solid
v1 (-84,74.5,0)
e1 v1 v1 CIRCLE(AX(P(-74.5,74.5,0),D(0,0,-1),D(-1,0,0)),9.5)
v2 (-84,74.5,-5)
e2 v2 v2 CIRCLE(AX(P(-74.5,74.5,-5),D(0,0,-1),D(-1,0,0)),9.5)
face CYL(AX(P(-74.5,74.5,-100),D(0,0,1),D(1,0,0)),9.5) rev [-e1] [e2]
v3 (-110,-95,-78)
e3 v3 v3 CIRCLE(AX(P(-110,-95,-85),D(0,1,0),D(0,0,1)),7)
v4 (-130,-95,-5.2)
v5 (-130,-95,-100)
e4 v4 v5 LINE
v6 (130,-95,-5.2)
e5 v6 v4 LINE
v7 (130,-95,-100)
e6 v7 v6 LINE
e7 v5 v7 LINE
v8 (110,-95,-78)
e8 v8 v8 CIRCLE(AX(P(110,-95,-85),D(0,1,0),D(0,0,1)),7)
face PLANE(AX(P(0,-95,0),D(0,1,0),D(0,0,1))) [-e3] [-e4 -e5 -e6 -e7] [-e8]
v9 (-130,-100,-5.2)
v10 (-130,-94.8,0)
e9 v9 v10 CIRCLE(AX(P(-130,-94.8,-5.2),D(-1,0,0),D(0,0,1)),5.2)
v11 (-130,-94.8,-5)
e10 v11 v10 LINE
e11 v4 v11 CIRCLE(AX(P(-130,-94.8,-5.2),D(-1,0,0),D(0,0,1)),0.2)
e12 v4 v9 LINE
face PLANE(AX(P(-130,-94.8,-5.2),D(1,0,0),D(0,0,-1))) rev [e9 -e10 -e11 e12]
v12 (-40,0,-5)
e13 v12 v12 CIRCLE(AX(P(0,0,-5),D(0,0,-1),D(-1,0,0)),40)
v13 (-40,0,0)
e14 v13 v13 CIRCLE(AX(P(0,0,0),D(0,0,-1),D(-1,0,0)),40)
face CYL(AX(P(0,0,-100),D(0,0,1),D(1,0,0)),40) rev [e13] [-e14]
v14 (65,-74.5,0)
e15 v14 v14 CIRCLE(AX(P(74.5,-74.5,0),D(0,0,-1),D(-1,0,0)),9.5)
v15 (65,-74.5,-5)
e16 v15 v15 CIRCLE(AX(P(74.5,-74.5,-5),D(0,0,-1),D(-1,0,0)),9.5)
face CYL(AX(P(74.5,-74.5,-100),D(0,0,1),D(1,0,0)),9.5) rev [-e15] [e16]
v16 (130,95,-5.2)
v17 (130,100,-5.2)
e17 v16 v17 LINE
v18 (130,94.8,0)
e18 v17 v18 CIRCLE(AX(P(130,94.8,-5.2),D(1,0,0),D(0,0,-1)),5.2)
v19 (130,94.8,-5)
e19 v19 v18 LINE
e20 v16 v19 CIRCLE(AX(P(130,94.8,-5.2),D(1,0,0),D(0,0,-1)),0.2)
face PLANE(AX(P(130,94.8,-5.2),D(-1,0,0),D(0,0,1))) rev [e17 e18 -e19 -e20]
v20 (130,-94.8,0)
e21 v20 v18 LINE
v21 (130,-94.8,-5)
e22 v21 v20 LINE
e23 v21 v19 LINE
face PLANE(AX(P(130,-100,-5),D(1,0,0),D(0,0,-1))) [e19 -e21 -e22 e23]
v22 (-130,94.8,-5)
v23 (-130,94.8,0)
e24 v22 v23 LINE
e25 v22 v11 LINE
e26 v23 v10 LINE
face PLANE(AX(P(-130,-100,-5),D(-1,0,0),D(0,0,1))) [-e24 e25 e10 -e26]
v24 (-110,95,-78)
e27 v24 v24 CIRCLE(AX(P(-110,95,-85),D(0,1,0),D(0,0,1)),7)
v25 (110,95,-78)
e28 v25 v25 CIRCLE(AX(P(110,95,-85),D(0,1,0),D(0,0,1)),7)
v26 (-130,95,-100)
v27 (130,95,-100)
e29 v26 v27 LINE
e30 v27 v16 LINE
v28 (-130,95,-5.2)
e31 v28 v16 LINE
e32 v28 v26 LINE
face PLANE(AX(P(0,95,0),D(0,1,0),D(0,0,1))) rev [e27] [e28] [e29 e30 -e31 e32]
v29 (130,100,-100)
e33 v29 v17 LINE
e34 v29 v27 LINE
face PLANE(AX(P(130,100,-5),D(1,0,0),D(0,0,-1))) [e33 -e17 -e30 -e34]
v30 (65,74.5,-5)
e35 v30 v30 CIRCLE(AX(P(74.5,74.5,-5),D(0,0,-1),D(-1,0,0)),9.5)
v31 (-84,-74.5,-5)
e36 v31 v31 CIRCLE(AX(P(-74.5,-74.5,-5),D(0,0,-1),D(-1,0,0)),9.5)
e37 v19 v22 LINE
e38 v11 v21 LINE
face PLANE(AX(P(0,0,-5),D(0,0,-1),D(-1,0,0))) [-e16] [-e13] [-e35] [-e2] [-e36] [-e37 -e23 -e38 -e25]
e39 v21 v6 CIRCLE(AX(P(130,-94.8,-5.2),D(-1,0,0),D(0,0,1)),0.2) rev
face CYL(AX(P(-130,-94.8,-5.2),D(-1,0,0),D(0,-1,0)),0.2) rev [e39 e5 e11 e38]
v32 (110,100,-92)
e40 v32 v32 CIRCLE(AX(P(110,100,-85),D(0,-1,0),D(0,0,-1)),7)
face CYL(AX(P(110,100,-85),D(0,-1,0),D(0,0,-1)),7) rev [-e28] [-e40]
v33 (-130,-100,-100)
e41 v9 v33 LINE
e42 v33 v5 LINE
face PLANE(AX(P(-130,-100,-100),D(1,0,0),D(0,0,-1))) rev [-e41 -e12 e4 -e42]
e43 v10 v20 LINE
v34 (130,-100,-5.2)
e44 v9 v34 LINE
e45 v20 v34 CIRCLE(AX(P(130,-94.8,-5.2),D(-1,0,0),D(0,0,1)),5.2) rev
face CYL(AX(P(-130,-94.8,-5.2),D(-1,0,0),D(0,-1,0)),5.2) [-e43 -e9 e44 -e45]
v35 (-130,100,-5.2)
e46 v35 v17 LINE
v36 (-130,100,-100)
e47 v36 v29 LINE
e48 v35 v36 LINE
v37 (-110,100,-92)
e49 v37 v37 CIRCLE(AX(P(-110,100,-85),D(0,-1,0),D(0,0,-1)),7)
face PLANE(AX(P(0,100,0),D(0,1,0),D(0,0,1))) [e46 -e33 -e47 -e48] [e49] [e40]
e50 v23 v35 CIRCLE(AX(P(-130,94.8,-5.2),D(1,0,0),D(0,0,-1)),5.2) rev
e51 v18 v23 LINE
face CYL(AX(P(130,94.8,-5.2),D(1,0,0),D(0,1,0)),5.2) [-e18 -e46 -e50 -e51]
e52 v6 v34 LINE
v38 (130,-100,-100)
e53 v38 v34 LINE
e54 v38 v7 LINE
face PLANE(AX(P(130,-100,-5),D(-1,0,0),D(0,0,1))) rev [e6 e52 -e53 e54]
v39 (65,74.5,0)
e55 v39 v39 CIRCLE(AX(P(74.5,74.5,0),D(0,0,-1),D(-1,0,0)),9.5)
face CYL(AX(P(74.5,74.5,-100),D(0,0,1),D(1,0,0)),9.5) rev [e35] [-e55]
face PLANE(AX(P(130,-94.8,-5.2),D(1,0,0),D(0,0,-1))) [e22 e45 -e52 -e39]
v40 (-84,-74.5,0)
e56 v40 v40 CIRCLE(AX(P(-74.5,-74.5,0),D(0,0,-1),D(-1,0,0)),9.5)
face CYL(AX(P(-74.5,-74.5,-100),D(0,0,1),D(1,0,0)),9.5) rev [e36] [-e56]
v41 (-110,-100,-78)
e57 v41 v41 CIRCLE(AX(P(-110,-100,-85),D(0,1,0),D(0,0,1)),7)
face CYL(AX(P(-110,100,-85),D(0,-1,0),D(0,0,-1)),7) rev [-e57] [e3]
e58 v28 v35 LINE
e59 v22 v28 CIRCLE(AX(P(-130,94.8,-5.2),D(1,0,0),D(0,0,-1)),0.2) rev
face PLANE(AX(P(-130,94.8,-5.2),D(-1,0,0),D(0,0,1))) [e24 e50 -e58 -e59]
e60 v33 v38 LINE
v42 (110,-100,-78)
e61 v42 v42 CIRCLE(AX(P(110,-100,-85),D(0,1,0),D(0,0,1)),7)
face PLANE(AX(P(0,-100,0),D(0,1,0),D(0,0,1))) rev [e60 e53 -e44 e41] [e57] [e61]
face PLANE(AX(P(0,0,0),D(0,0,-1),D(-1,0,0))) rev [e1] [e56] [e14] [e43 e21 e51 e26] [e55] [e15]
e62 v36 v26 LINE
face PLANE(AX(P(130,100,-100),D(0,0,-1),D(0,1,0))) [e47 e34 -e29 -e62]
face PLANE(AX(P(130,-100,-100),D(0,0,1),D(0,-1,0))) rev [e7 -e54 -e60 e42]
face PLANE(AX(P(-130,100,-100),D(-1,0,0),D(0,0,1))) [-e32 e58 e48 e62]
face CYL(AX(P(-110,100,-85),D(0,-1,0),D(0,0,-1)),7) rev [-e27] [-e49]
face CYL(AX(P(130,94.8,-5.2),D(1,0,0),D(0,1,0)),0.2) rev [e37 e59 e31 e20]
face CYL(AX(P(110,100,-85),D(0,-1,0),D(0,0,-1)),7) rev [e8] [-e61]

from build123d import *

# Parameters (mm, degrees)
SKETCH1_W                    = 260
SKETCH1_H                    = 200
BASE_FLANGE1_DEPTH           = 5
EDGE_FLANGE1_STRIP_W         = 20.4
EDGE_FLANGE1_STRIP_H         = 5
EDGE_FLANGE1_STRIP_CUT_DEPTH = 260
EDGE_FLANGE1_DEPTH           = 260
EDGE_FLANGE2_STRIP_W         = 20.4
EDGE_FLANGE2_STRIP_H         = 5
EDGE_FLANGE2_STRIP_CUT_DEPTH = 260
EDGE_FLANGE2_DEPTH           = 260
CUT_EXTRUDE1_DEPTH           = 193.093727123
CUT_EXTRUDE1_DEPTH_BACK      = 193.093727123
SKETCH12_R                   = 40
CUT_EXTRUDE2_DEPTH           = 193.093727123
CUT_EXTRUDE2_DEPTH_BACK      = 193.093727123
SKETCH13_R                   = 9.5
CUT_EXTRUDE3_DEPTH           = 259.650343128
CUT_EXTRUDE3_DEPTH_BACK      = 259.650343128
SKETCH14_R                   = 7


# Sheet-metal steps are written as plain solids
with BuildPart() as part:
    # Sketch1 → Base-Flange1 (new body)
    with BuildSketch(Plane.XY):
        Rectangle(SKETCH1_W, SKETCH1_H)
    extrude(amount=-BASE_FLANGE1_DEPTH)

    # Edge-Flange1 strip (across the edge) → Edge-Flange1 strip cut (cut)
    with BuildSketch(Plane(origin=(-130, 100, -5), x_dir=(0, -1, 0), z_dir=(1, 0, 0))):
        with Locations((-5, -2.5)):
            Rectangle(EDGE_FLANGE1_STRIP_W, EDGE_FLANGE1_STRIP_H)
    extrude(amount=EDGE_FLANGE1_STRIP_CUT_DEPTH, mode=Mode.SUBTRACT)

    # Edge-Flange1 section (across the edge) → Edge-Flange1 (add)
    with BuildSketch(Plane(origin=(-130, 100, -5), x_dir=(0, -1, 0), z_dir=(1, 0, 0))):
        with BuildLine():
            Line((0, 0.2), (0, 95))
            Line((0, 95), (5, 95))
            Line((5, 95), (5, 0.2))
            ThreePointArc((5, 0.2), (5.058578644, 0.058578644), (5.2, 0))
            Line((5.2, 0), (5.2, -5))
            ThreePointArc((5.2, -5), (1.523044738, -3.476955262), (0, 0.2))
        make_face()
    extrude(amount=EDGE_FLANGE1_DEPTH)

    # Edge-Flange2 strip (across the edge) → Edge-Flange2 strip cut (cut)
    with BuildSketch(Plane(origin=(130, -100, -5), x_dir=(0, 1, 0), z_dir=(-1, 0, 0))):
        with Locations((-5, -2.5)):
            Rectangle(EDGE_FLANGE2_STRIP_W, EDGE_FLANGE2_STRIP_H)
    extrude(amount=EDGE_FLANGE2_STRIP_CUT_DEPTH, mode=Mode.SUBTRACT)

    # Edge-Flange2 section (across the edge) → Edge-Flange2 (add)
    with BuildSketch(Plane(origin=(130, -100, -5), x_dir=(0, 1, 0), z_dir=(-1, 0, 0))):
        with BuildLine():
            Line((0, 0.2), (0, 95))
            Line((0, 95), (5, 95))
            Line((5, 95), (5, 0.2))
            ThreePointArc((5, 0.2), (5.058578644, 0.058578644), (5.2, 0))
            Line((5.2, 0), (5.2, -5))
            ThreePointArc((5.2, -5), (1.523044738, -3.476955262), (0, 0.2))
        make_face()
    extrude(amount=EDGE_FLANGE2_DEPTH)

    # Sketch12 → Cut-Extrude1 (cut, two sides: drawn at the far end of the back side and taken through both)
    with BuildSketch(Plane.XY.offset(-CUT_EXTRUDE1_DEPTH_BACK)):
        with Locations(Location((0, 0, 0), (0, 0, 180))):
            Circle(SKETCH12_R)
    extrude(amount=CUT_EXTRUDE1_DEPTH + CUT_EXTRUDE1_DEPTH_BACK, mode=Mode.SUBTRACT)

    # Sketch13 → Cut-Extrude2 (cut, two sides: drawn at the far end of the back side and taken through both)
    with BuildSketch(Plane.XY.offset(-CUT_EXTRUDE2_DEPTH_BACK)):
        with Locations(Location((74.5, 74.5, 0), (0, 0, 180))):
            Circle(SKETCH13_R)
        with Locations(Location((-74.5, 74.5, 0), (0, 0, 180))):
            Circle(SKETCH13_R)
        with Locations(Location((-74.5, -74.5, 0), (0, 0, 180))):
            Circle(SKETCH13_R)
        with Locations(Location((74.5, -74.5, 0), (0, 0, 180))):
            Circle(SKETCH13_R)
    extrude(amount=CUT_EXTRUDE2_DEPTH + CUT_EXTRUDE2_DEPTH_BACK, mode=Mode.SUBTRACT)

    # Sketch14 → Cut-Extrude3 (cut, two sides: drawn at the far end of the back side and taken through both)
    with BuildSketch(Plane(origin=(0, -100, 0), x_dir=(-1, 0, 0), z_dir=(0, -1, 0)).offset(-CUT_EXTRUDE3_DEPTH_BACK)):
        with Locations(Location((110, 85, 0), (0, 0, 270))):
            Circle(SKETCH14_R)
        with Locations(Location((-110, 85, 0), (0, 0, 270))):
            Circle(SKETCH14_R)
    extrude(amount=CUT_EXTRUDE3_DEPTH + CUT_EXTRUDE3_DEPTH_BACK, mode=Mode.SUBTRACT)


solid = part.part
